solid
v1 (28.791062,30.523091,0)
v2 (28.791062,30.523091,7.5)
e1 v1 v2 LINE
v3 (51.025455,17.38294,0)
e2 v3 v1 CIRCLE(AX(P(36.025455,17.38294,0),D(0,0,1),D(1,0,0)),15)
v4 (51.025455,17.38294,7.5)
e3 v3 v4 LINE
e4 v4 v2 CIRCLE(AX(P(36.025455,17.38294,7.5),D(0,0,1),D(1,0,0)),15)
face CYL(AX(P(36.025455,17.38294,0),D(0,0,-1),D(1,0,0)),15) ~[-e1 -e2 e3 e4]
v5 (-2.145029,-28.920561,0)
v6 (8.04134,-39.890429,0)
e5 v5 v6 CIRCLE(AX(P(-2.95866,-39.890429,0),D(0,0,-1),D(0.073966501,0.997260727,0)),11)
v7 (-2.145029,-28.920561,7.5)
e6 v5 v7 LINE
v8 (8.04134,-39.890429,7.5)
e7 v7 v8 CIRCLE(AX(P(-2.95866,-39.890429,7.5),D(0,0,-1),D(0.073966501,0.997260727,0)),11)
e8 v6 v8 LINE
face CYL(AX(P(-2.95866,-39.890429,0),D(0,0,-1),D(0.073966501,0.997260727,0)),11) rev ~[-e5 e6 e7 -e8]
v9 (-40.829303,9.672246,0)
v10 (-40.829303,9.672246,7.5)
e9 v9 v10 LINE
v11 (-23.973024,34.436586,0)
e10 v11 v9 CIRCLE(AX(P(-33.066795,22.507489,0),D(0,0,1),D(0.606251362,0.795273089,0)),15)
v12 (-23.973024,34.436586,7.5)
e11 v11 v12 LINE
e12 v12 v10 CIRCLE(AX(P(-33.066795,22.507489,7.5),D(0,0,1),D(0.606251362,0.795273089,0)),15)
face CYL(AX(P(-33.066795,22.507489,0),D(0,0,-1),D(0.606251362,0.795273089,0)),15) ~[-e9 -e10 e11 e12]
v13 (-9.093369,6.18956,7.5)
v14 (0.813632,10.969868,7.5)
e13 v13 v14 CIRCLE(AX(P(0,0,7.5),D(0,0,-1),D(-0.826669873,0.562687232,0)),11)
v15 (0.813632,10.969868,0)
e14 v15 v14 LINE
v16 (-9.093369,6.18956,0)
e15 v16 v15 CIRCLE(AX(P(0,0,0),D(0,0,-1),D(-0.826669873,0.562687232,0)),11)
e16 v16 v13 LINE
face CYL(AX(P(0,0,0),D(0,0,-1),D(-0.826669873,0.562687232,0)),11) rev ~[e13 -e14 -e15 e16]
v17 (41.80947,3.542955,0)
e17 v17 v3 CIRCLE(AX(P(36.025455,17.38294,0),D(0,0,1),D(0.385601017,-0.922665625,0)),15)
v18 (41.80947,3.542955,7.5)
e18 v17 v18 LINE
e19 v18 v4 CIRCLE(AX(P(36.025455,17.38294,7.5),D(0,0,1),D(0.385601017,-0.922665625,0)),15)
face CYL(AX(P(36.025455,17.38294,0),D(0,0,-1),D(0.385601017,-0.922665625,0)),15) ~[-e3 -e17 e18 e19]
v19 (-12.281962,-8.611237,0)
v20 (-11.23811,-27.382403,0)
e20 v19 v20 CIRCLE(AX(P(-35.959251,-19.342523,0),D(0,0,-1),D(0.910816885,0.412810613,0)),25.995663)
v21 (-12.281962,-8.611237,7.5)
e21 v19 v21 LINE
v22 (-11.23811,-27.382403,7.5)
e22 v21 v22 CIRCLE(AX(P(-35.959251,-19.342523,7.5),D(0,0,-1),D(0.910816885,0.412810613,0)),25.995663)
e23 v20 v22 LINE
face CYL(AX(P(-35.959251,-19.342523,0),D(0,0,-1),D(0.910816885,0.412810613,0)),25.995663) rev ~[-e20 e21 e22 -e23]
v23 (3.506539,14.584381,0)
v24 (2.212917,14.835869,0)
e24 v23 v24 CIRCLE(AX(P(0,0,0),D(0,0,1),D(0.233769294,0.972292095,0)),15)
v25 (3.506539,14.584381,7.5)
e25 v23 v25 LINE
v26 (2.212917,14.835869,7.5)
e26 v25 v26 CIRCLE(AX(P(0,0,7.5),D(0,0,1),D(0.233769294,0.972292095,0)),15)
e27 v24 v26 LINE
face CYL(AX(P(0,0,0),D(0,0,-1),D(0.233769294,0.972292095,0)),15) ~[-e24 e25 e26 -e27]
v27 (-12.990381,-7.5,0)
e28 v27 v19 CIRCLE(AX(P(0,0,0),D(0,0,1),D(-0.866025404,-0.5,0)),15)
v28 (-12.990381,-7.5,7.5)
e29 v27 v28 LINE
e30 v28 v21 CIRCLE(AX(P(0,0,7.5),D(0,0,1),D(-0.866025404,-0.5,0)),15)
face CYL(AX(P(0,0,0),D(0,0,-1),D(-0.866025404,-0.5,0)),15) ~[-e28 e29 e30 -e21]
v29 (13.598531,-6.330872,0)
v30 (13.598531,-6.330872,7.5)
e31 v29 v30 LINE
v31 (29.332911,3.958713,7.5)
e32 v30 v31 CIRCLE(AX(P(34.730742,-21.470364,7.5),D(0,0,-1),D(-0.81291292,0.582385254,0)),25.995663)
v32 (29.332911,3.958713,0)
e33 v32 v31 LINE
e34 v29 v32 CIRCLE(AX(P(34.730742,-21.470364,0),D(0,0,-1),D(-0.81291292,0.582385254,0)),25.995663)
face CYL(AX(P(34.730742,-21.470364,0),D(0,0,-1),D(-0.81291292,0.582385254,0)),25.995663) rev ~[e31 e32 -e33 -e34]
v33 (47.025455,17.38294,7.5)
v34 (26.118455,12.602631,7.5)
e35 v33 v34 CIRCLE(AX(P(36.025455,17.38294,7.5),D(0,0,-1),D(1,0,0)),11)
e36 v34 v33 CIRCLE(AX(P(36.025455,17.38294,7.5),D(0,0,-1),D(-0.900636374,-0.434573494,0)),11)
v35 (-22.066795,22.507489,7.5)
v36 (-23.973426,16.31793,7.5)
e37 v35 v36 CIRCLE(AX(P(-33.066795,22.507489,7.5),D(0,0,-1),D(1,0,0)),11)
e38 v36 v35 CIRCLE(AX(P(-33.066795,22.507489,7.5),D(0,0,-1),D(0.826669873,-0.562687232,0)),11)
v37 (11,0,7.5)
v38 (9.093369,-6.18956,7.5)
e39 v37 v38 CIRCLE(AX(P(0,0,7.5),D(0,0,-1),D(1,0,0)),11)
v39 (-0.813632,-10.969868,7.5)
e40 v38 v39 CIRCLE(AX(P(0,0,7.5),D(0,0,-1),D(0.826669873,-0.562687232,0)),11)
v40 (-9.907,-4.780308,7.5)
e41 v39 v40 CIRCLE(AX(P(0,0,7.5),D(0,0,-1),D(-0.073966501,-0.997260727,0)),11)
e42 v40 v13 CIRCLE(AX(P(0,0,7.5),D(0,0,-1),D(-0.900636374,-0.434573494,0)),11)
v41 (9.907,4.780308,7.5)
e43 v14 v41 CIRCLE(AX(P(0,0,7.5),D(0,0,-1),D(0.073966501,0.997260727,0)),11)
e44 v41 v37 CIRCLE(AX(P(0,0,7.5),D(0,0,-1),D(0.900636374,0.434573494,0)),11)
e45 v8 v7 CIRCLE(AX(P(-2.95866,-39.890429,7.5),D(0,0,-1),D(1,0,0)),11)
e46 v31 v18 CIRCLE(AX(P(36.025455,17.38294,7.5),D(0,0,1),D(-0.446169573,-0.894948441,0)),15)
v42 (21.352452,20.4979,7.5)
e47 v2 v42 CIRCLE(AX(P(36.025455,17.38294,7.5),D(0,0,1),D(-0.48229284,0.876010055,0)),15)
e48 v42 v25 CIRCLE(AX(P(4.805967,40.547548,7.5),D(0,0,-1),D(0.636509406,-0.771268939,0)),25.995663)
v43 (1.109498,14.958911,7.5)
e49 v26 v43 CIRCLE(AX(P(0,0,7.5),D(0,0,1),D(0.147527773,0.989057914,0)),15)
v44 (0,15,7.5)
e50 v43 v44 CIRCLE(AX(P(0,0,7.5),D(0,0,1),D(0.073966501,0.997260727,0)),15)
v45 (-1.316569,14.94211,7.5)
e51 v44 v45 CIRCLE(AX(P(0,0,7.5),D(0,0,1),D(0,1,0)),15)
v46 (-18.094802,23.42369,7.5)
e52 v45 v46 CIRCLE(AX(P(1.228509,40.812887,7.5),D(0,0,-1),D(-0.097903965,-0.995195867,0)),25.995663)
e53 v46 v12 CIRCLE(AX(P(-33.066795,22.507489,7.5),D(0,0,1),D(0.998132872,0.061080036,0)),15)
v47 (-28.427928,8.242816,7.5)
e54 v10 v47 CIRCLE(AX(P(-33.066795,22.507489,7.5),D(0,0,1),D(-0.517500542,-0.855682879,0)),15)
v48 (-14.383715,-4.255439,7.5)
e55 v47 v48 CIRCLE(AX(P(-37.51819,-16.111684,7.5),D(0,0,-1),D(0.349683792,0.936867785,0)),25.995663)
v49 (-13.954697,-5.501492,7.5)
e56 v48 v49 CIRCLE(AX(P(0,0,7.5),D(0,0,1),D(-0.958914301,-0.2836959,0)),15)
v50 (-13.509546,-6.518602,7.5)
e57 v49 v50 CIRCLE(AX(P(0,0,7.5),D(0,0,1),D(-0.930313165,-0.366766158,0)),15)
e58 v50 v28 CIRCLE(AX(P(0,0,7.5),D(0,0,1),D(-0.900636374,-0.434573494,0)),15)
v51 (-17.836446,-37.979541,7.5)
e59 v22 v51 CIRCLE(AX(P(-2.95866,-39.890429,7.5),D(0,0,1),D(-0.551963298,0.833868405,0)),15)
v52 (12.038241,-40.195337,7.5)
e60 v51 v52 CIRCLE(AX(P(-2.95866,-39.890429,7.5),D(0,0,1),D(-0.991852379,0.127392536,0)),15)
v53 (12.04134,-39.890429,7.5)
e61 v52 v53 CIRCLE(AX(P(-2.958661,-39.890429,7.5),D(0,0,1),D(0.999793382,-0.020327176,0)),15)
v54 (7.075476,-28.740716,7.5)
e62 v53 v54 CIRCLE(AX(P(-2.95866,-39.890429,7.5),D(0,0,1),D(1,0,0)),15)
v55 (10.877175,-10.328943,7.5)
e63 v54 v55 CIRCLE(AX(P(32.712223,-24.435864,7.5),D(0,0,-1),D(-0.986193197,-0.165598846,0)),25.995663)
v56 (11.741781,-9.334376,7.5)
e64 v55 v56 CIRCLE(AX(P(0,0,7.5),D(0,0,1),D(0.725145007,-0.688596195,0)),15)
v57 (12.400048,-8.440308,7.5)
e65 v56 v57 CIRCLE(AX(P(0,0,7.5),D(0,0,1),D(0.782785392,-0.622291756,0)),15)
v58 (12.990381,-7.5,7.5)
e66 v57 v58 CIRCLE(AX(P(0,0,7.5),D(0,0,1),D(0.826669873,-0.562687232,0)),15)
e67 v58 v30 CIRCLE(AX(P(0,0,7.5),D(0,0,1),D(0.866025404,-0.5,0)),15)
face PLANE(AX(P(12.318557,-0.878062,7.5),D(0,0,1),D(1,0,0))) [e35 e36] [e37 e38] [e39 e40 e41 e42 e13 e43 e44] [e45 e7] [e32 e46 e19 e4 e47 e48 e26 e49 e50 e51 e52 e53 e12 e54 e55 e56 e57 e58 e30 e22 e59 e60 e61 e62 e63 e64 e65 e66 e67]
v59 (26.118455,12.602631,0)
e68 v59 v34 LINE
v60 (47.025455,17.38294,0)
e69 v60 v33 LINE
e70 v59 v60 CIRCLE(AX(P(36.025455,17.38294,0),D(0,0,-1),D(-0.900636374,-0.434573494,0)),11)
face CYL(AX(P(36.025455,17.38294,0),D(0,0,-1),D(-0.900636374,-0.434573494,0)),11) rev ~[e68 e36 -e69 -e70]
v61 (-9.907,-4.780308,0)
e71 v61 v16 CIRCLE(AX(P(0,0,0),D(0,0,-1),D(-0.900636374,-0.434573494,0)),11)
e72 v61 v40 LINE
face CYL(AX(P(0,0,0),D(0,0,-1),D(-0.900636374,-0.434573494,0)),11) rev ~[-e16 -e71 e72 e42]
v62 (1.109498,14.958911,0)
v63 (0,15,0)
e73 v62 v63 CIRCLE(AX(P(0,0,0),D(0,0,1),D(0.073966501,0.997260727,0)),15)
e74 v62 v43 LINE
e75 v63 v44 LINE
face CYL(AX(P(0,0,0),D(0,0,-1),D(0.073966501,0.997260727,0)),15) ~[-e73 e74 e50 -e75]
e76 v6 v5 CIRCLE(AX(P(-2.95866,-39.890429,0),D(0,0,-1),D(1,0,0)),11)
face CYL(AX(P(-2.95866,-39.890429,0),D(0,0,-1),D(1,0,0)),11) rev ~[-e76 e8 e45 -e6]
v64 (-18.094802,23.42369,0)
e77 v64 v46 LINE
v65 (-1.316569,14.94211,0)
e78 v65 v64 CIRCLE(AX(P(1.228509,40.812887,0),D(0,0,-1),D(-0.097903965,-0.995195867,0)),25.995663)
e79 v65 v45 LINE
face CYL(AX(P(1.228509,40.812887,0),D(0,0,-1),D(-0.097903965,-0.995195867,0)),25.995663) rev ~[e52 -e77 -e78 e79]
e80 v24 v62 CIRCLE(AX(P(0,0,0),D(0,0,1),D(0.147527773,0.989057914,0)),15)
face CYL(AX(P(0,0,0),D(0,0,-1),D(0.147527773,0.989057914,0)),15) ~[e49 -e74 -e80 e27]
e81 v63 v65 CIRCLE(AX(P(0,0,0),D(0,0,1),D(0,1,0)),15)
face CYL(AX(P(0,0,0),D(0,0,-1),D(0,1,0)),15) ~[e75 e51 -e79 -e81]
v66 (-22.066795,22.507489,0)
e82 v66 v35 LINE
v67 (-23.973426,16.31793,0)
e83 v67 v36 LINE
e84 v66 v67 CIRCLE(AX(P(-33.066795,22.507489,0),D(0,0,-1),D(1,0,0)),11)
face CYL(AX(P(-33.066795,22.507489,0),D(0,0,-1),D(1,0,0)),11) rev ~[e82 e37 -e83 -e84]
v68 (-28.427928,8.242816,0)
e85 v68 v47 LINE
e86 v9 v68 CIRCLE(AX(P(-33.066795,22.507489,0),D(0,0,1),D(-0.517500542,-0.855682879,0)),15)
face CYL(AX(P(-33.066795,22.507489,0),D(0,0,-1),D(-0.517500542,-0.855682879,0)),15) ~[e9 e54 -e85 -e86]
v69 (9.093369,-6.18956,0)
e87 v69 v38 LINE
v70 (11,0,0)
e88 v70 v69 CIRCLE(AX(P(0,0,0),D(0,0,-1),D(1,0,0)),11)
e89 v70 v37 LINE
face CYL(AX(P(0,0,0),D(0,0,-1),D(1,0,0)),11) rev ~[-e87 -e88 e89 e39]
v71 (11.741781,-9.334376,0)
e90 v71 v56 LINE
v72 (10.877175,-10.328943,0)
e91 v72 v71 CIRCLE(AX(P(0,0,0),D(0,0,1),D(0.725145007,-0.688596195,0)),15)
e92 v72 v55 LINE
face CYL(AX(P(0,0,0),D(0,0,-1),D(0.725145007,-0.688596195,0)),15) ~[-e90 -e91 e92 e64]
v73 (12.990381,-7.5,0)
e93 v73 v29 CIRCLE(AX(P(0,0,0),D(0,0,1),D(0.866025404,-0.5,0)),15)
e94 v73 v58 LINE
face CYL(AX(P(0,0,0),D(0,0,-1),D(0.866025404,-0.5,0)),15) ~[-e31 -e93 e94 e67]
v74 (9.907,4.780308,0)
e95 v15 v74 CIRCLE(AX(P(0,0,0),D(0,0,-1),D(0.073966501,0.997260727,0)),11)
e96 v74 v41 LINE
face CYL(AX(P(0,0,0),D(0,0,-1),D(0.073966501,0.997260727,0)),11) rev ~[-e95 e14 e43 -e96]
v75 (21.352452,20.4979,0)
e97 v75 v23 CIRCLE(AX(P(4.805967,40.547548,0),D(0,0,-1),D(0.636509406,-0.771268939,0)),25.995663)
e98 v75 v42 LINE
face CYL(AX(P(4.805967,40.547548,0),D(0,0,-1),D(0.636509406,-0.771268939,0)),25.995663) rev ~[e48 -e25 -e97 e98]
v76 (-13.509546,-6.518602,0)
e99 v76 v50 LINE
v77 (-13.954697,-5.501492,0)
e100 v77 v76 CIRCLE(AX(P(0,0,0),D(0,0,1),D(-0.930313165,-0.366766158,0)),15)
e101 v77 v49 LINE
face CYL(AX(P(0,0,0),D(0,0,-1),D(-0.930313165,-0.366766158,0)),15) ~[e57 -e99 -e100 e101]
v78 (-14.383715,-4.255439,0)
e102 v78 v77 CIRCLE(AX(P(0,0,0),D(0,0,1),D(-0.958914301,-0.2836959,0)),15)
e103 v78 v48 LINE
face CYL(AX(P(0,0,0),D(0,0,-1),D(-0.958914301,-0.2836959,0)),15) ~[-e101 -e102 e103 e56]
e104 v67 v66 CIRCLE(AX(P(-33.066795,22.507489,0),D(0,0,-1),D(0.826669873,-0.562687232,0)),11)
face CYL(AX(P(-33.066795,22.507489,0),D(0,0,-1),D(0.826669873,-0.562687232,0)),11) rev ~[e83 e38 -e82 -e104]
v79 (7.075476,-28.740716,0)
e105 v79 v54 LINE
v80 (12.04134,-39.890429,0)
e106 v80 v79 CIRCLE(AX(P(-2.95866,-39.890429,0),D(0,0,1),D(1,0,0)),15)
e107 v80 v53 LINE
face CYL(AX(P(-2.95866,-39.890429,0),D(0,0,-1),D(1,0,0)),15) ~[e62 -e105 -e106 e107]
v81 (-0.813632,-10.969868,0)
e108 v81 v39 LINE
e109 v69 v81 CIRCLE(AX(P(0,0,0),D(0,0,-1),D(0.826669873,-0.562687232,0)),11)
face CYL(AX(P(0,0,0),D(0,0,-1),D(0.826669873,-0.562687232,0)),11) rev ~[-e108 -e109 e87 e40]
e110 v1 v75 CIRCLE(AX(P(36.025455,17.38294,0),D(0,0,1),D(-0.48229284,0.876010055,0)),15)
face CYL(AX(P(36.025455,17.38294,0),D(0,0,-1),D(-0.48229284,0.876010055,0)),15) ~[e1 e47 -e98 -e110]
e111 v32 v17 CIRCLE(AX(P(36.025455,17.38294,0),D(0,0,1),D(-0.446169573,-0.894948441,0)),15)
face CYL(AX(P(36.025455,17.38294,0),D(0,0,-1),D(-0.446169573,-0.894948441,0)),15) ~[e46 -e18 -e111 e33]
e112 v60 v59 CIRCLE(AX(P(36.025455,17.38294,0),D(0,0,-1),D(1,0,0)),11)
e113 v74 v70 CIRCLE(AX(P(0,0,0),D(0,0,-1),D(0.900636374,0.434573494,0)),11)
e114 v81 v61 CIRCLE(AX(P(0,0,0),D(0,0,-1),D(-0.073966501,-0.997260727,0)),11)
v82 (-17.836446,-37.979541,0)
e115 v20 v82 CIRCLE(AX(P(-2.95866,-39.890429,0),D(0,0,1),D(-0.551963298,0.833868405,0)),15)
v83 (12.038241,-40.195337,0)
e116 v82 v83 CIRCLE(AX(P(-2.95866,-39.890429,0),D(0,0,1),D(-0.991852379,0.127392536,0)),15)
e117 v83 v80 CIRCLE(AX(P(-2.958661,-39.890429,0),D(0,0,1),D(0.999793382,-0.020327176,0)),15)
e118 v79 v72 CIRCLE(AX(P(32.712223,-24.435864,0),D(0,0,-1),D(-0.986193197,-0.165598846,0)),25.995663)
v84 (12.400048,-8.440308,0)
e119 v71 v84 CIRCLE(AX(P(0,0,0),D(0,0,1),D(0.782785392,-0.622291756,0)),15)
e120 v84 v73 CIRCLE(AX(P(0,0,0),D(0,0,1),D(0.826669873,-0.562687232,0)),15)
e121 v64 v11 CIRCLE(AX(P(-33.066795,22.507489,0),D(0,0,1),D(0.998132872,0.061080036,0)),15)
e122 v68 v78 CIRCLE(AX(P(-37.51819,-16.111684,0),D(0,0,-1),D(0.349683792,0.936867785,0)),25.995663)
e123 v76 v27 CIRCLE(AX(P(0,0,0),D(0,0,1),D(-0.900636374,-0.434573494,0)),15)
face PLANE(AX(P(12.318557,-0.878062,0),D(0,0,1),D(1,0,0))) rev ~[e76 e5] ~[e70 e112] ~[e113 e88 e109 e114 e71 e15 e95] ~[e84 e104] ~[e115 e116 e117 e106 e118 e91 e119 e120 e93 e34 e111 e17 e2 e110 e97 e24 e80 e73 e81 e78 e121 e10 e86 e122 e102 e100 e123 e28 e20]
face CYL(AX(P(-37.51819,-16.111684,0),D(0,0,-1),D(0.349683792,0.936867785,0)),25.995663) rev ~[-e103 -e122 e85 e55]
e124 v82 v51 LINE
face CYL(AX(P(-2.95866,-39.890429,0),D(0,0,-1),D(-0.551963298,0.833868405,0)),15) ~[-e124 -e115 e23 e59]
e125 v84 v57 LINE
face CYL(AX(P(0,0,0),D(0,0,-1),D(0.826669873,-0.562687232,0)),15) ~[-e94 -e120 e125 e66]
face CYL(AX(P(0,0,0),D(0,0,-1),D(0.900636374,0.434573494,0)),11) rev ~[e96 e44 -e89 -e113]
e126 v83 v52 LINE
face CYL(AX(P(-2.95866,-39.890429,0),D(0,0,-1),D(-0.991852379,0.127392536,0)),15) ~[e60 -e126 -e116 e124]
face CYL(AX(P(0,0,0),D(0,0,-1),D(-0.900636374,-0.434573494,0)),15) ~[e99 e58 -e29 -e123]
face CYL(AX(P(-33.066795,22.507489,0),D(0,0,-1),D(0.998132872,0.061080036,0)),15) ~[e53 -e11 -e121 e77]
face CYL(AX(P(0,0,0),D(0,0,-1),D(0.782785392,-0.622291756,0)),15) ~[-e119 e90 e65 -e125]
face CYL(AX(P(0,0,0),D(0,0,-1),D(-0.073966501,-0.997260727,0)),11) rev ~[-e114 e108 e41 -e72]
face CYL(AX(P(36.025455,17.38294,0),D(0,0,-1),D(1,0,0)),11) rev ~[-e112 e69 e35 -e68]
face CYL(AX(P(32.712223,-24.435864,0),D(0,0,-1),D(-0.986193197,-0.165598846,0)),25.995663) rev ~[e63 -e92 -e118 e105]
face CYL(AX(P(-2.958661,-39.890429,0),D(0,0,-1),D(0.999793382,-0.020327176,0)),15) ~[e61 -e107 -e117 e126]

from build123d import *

# Parameters (mm, degrees)
F1_DEPTH = 7.5


with BuildPart() as f1:
    # F0 (on Top) → F1 (new body)
    with BuildSketch(Plane.XY):
        with BuildLine():
            ThreePointArc((9.9070001123, 4.7803084394), (10.7232691199, 2.4518359208), (11, 0))
            ThreePointArc((11, 0), (10.5125414298, -3.2382823666), (9.0933686025, -6.1895595528))
            Line((9.0933686025, -6.1895595528), (12.2828647672, -8.3605456107))
            ThreePointArc((12.2828647672, -8.3605456107), (12.9170786369, -7.3303985813), (13.5985312991, -6.3308724918))
            ThreePointArc((13.5985312991, -6.3308724918), (14.6454424564, -3.2420695947), (15, 0))
            ThreePointArc((15, 0), (14.6226397089, 3.3434126193), (13.5095456076, 6.5186024173))
            Line((13.5095456076, 6.5186024173), (9.9070001123, 4.7803084394))
        make_face()
        with BuildLine():
            ThreePointArc((0.8136315097, 10.9698679922), (6.1895595528, 9.0933686025), (9.9070001123, 4.7803084394))
            Line((9.9070001123, 4.7803084394), (13.5095456076, 6.5186024173))
            ThreePointArc((13.5095456076, 6.5186024173), (9.4154652066, 11.6768580939), (3.5065394099, 14.5843814187))
            ThreePointArc((3.5065394099, 14.5843814187), (2.3000626139, 14.6729470743), (1.0990125047, 14.817545725))
            Line((1.0990125047, 14.817545725), (0.8136315097, 10.9698679922))
        make_face()
        with BuildLine():
            Line((12.2828647672, -8.3605456107), (9.0933686025, -6.1895595528))
            ThreePointArc((9.0933686025, -6.1895595528), (4.7803084394, -9.9070001123), (-0.8136315097, -10.9698679922))
            Line((-0.8136315097, -10.9698679922), (-1.1094975133, -14.9589108985))
            ThreePointArc((-1.1094975133, -14.9589108985), (5.4047231424, -13.9924611043), (10.8771751021, -10.3289429177))
            ThreePointArc((10.8771751021, -10.3289429177), (11.5571136078, -9.3283861911), (12.2828647672, -8.3605456107))
        make_face()
        with BuildLine():
            ThreePointArc((-9.0933686025, 6.1895595528), (-4.7803084394, 9.9070001123), (0.8136315097, 10.9698679922))
            Line((0.8136315097, 10.9698679922), (1.0990125047, 14.817545725))
            ThreePointArc((1.0990125047, 14.817545725), (-0.1102279272, 14.8517175329), (-1.3165692436, 14.9421098051))
            ThreePointArc((-1.3165692436, 14.9421098051), (-7.5897795036, 12.9381315145), (-12.4000480944, 8.4403084812))
            Line((-12.4000480944, 8.4403084812), (-9.0933686025, 6.1895595528))
        make_face()
        with BuildLine():
            Line((22.5159093461, 10.8643373622), (13.5095456076, 6.5186024173))
            ThreePointArc((13.5095456076, 6.5186024173), (14.6226397089, 3.3434126193), (15, 0))
            ThreePointArc((15, 0), (14.6454424564, -3.2420695947), (13.5985312991, -6.3308724918))
            ThreePointArc((13.5985312991, -6.3308724918), (20.5029640043, 0.2861263258), (29.3329113564, 3.958713165))
            ThreePointArc((29.3329113564, 3.958713165), (25.3505772753, 6.8450563796), (22.5159093461, 10.8643373622))
        make_face()
        with BuildLine():
            ThreePointArc((3.5065394099, 14.5843814187), (9.4154652066, 11.6768580939), (13.5095456076, 6.5186024173))
            Line((13.5095456076, 6.5186024173), (22.5159093461, 10.8643373622))
            ThreePointArc((22.5159093461, 10.8643373622), (21.1336653873, 15.5844394293), (21.3524517486, 20.4978999628))
            ThreePointArc((21.3524517486, 20.4978999628), (12.9828009771, 15.8713666716), (3.5065394099, 14.5843814187))
        make_face()
        with BuildLine():
            Line((-1.1094975133, -14.9589108985), (-0.8136315097, -10.9698679922))
            ThreePointArc((-0.8136315097, -10.9698679922), (-6.1895595528, -9.0933686025), (-9.9070001123, -4.7803084394))
            Line((-9.9070001123, -4.7803084394), (-13.381877272, -6.4570001143))
            ThreePointArc((-13.381877272, -6.4570001143), (-12.8068507097, -7.5213189516), (-12.2819620555, -8.6112373133))
            ThreePointArc((-12.2819620555, -8.6112373133), (-7.4098608173, -13.0420076165), (-1.1094975133, -14.9589108985))
        make_face()
        with BuildLine():
            ThreePointArc((12.9903810568, -7.5), (12.6320125035, -7.9264822577), (12.2828647672, -8.3605456107))
            Line((12.2828647672, -8.3605456107), (12.4000480944, -8.4403084812))
            ThreePointArc((12.4000480944, -8.4403084812), (12.7039174324, -7.9756179616), (12.9903810568, -7.5))
        make_face()
        with BuildLine():
            ThreePointArc((13.5985312991, -6.3308724918), (12.9170786369, -7.3303985813), (12.2828647672, -8.3605456107))
            ThreePointArc((12.2828647672, -8.3605456107), (12.6320125035, -7.9264822577), (12.9903810568, -7.5))
            ThreePointArc((12.9903810568, -7.5), (13.3073017494, -6.9221181838), (13.5985312991, -6.3308724918))
        make_face()
        with BuildLine():
            ThreePointArc((11.7417808873, -9.3343763367), (12.0071054891, -8.8445620945), (12.2828647672, -8.3605456107))
            ThreePointArc((12.2828647672, -8.3605456107), (11.5571136078, -9.3283861911), (10.8771751021, -10.3289429177))
            ThreePointArc((10.8771751021, -10.3289429177), (11.3204056104, -9.8411593228), (11.7417808873, -9.3343763367))
        make_face()
        with BuildLine():
            Line((12.4000480944, -8.4403084812), (12.2828647672, -8.3605456107))
            ThreePointArc((12.2828647672, -8.3605456107), (12.0071054891, -8.8445620945), (11.7417808873, -9.3343763367))
            ThreePointArc((11.7417808873, -9.3343763367), (12.0791893759, -8.8934348832), (12.4000480944, -8.4403084812))
        make_face()
        with BuildLine():
            ThreePointArc((-9.9070001123, -4.7803084394), (-10.9698679922, 0.8136315097), (-9.0933686025, 6.1895595528))
            Line((-9.0933686025, 6.1895595528), (-12.4000480944, 8.4403084812))
            ThreePointArc((-12.4000480944, 8.4403084812), (-14.8201883489, 2.3156030104), (-14.383714512, -4.255438501))
            ThreePointArc((-14.383714512, -4.255438501), (-13.8571762217, -5.3445608832), (-13.381877272, -6.4570001143))
            Line((-13.381877272, -6.4570001143), (-9.9070001123, -4.7803084394))
        make_face()
        with BuildLine():
            ThreePointArc((-1.3165692436, 14.9421098051), (-0.1102279272, 14.8517175329), (1.0990125047, 14.817545725))
            ThreePointArc((1.0990125047, 14.817545725), (0.5485287461, 14.9028848578), (0, 15))
            ThreePointArc((0, 15), (-0.6589206796, 14.9855204627), (-1.3165692436, 14.9421098051))
        make_face()
        with BuildLine():
            ThreePointArc((2.2129165924, 14.8358687024), (1.6560627147, 14.8207394268), (1.0990125047, 14.817545725))
            ThreePointArc((1.0990125047, 14.817545725), (2.3000626139, 14.6729470743), (3.5065394099, 14.5843814187))
            ThreePointArc((3.5065394099, 14.5843814187), (2.862491171, 14.7243385011), (2.2129165924, 14.8358687024))
        make_face()
        with BuildLine():
            ThreePointArc((0, 15), (0.5485287461, 14.9028848578), (1.0990125047, 14.817545725))
            Line((1.0990125047, 14.817545725), (1.1094975133, 14.9589108985))
            ThreePointArc((1.1094975133, 14.9589108985), (0.5551290495, 14.9897242049), (0, 15))
        make_face()
        with BuildLine():
            Line((1.1094975133, 14.9589108985), (1.0990125047, 14.817545725))
            ThreePointArc((1.0990125047, 14.817545725), (1.6560627147, 14.8207394268), (2.2129165924, 14.8358687024))
            ThreePointArc((2.2129165924, 14.8358687024), (1.6623458479, 14.9076022982), (1.1094975133, 14.9589108985))
        make_face()
        with BuildLine():
            ThreePointArc((21.3524517486, 20.4978999628), (21.1336653873, 15.5844394293), (22.5159093461, 10.8643373622))
            ThreePointArc((22.5159093461, 10.8643373622), (25.3505772753, 6.8450563796), (29.3329113564, 3.958713165))
            ThreePointArc((29.3329113564, 3.958713165), (35.5965178278, 4.510878729), (41.8094702076, 3.5429554029))
            ThreePointArc((41.8094702076, 3.5429554029), (48.5106507633, 9.0691027835), (51.0254549537, 17.3829397795))
            ThreePointArc((51.0254549537, 17.3829397795), (43.6571032384, 30.2964189566), (28.7910623593, 30.5230906078))
            ThreePointArc((28.7910623593, 30.5230906078), (25.682469555, 25.0573515346), (21.3524517486, 20.4978999628))
        make_face()
        with BuildLine():
            ThreePointArc((47.0254549537, 17.3829397795), (38.4772908745, 6.6596706596), (26.1184548414, 12.6026313401))
            ThreePointArc((26.1184548414, 12.6026313401), (33.5736190329, 28.1062088994), (47.0254549537, 17.3829397795))
        make_face(mode=Mode.SUBTRACT)
        with BuildLine():
            Line((-1.8491625221, -24.9315181641), (-1.1094975133, -14.9589108985))
            ThreePointArc((-1.1094975133, -14.9589108985), (-7.4098608173, -13.0420076165), (-12.2819620555, -8.6112373133))
            ThreePointArc((-12.2819620555, -8.6112373133), (-10.0036893353, -17.8991508435), (-11.238109511, -27.3824029841))
            ThreePointArc((-11.238109511, -27.3824029841), (-6.7472959226, -25.3767721108), (-1.8491625221, -24.9315181641))
        make_face()
        with BuildLine():
            ThreePointArc((10.8771751021, -10.3289429177), (5.4047231424, -13.9924611043), (-1.1094975133, -14.9589108985))
            Line((-1.1094975133, -14.9589108985), (-1.8491625221, -24.9315181641))
            ThreePointArc((-1.8491625221, -24.9315181641), (2.9296877559, -26.0945108152), (7.0754762177, -28.7407156288))
            ThreePointArc((7.0754762177, -28.7407156288), (7.2536062418, -19.1791187943), (10.8771751021, -10.3289429177))
        make_face()
        with BuildLine():
            Line((-20.666746824, 14.0671808019), (-12.4000480944, 8.4403084812))
            ThreePointArc((-12.4000480944, 8.4403084812), (-7.5897795036, 12.9381315145), (-1.3165692436, 14.9421098051))
            ThreePointArc((-1.3165692436, 14.9421098051), (-10.499274669, 17.6130245177), (-18.0948018454, 23.4236898191))
            ThreePointArc((-18.0948018454, 23.4236898191), (-18.073798285, 22.9658035339), (-18.0667949184, 22.5074892831))
            ThreePointArc((-18.0667949184, 22.5074892831), (-18.7315111504, 18.0916496922), (-20.666746824, 14.0671808019))
        make_face()
        with BuildLine():
            ThreePointArc((-14.383714512, -4.255438501), (-14.8201883489, 2.3156030104), (-12.4000480944, 8.4403084812))
            Line((-12.4000480944, 8.4403084812), (-20.666746824, 14.0671808019))
            ThreePointArc((-20.666746824, 14.0671808019), (-24.0633531432, 10.5100713858), (-28.4279279664, 8.242815666))
            ThreePointArc((-28.4279279664, 8.242815666), (-20.236407219, 3.3077521227), (-14.383714512, -4.255438501))
        make_face()
        with BuildLine():
            ThreePointArc((-12.9903810568, -7.5), (-13.1805412496, -6.9764026001), (-13.381877272, -6.4570001143))
            Line((-13.381877272, -6.4570001143), (-13.5095456076, -6.5186024173))
            ThreePointArc((-13.5095456076, -6.5186024173), (-13.2590464819, -7.0141062432), (-12.9903810568, -7.5))
        make_face()
        with BuildLine():
            ThreePointArc((-12.2819620555, -8.6112373133), (-12.8068507097, -7.5213189516), (-13.381877272, -6.4570001143))
            ThreePointArc((-13.381877272, -6.4570001143), (-13.1805412496, -6.9764026001), (-12.9903810568, -7.5))
            ThreePointArc((-12.9903810568, -7.5), (-12.6483810698, -8.0634022789), (-12.2819620555, -8.6112373133))
        make_face()
        with BuildLine():
            ThreePointArc((-13.9546974797, -5.5014923657), (-13.6631682038, -5.9761773322), (-13.381877272, -6.4570001143))
            ThreePointArc((-13.381877272, -6.4570001143), (-13.8571762217, -5.3445608832), (-14.383714512, -4.255438501))
            ThreePointArc((-14.383714512, -4.255438501), (-14.1828967814, -4.8831791784), (-13.9546974797, -5.5014923657))
        make_face()
        with BuildLine():
            Line((-13.5095456076, -6.5186024173), (-13.381877272, -6.4570001143))
            ThreePointArc((-13.381877272, -6.4570001143), (-13.6631682038, -5.9761773322), (-13.9546974797, -5.5014923657))
            ThreePointArc((-13.9546974797, -5.5014923657), (-13.7415352237, -6.014167415), (-13.5095456076, -6.5186024173))
        make_face()
        with BuildLine():
            ThreePointArc((28.7910623593, 30.5230906078), (23.979309946, 26.3210822294), (21.3524517486, 20.4978999628))
            ThreePointArc((21.3524517486, 20.4978999628), (25.682469555, 25.0573515346), (28.7910623593, 30.5230906078))
        make_face()
        with BuildLine():
            ThreePointArc((41.8094702076, 3.5429554029), (35.5965178278, 4.510878729), (29.3329113564, 3.958713165))
            ThreePointArc((29.3329113564, 3.958713165), (35.5258855723, 2.3912610732), (41.8094702076, 3.5429554029))
        make_face()
        with BuildLine():
            ThreePointArc((7.0754762177, -28.7407156288), (2.9296877559, -26.0945108152), (-1.8491625221, -24.9315181641))
            ThreePointArc((-1.8491625221, -24.9315181641), (-6.7472959226, -25.3767721108), (-11.238109511, -27.3824029841))
            ThreePointArc((-11.238109511, -27.3824029841), (-13.8917233412, -33.0829280896), (-17.8364457204, -37.97954102))
            ThreePointArc((-17.8364457204, -37.97954102), (-4.0681575486, -54.849339961), (12.0382406887, -40.195336709))
            ThreePointArc((12.0382406887, -40.195336709), (8.8590682031, -34.7703468338), (7.0754762177, -28.7407156288))
        make_face()
        with BuildLine():
            ThreePointArc((8.0413399646, -39.8904290626), (-11.0193655444, -47.3754158158), (-2.1450285256, -28.9205610704))
            ThreePointArc((-2.1450285256, -28.9205610704), (5.1020454737, -32.4054423093), (8.0413399646, -39.8904290626))
        make_face(mode=Mode.SUBTRACT)
        with BuildLine():
            ThreePointArc((12.0413399646, -39.8904290626), (10.7437493111, -33.7876446078), (7.0754762177, -28.7407156288))
            ThreePointArc((7.0754762177, -28.7407156288), (8.8590682031, -34.7703468338), (12.0382406887, -40.195336709))
            ThreePointArc((12.0382406887, -40.195336709), (12.0405651256, -40.0428907613), (12.0413399646, -39.8904290626))
        make_face()
        with BuildLine():
            ThreePointArc((-28.4279279664, 8.242815666), (-24.0633531432, 10.5100713858), (-20.666746824, 14.0671808019))
            ThreePointArc((-20.666746824, 14.0671808019), (-18.7315111504, 18.0916496922), (-18.0667949184, 22.5074892831))
            ThreePointArc((-18.0667949184, 22.5074892831), (-18.073798285, 22.9658035339), (-18.0948018454, 23.4236898191))
            ThreePointArc((-18.0948018454, 23.4236898191), (-21.7047944866, 28.5720493606), (-23.9730244872, 34.4365856171))
            ThreePointArc((-23.9730244872, 34.4365856171), (-45.4668430127, 30.9477977642), (-40.829303048, 9.6722461012))
            ThreePointArc((-40.829303048, 9.6722461012), (-34.541537758, 9.7129952992), (-28.4279279664, 8.242815666))
        make_face()
        with BuildLine():
            ThreePointArc((-22.0667949184, 22.5074892831), (-22.5542534885, 19.2692069164), (-23.9734263158, 16.3179297302))
            ThreePointArc((-23.9734263158, 16.3179297302), (-43.5793363482, 25.7457716497), (-22.0667949184, 22.5074892831))
        make_face(mode=Mode.SUBTRACT)
        with BuildLine():
            ThreePointArc((-23.9730244872, 34.4365856171), (-21.7047944866, 28.5720493606), (-18.0948018454, 23.4236898191))
            ThreePointArc((-18.0948018454, 23.4236898191), (-19.8338356226, 29.5706888609), (-23.9730244872, 34.4365856171))
        make_face()
        with BuildLine():
            ThreePointArc((-17.8364457204, -37.97954102), (-13.8917233412, -33.0829280896), (-11.238109511, -27.3824029841))
            ThreePointArc((-11.238109511, -27.3824029841), (-15.6920499497, -31.9619499341), (-17.8364457204, -37.97954102))
        make_face()
        with BuildLine():
            ThreePointArc((-40.829303048, 9.6722461012), (-34.7843808387, 7.6061504638), (-28.4279279664, 8.242815666))
            ThreePointArc((-28.4279279664, 8.242815666), (-34.541537758, 9.7129952992), (-40.829303048, 9.6722461012))
        make_face()
    extrude(amount=F1_DEPTH)


solid = f1.part
